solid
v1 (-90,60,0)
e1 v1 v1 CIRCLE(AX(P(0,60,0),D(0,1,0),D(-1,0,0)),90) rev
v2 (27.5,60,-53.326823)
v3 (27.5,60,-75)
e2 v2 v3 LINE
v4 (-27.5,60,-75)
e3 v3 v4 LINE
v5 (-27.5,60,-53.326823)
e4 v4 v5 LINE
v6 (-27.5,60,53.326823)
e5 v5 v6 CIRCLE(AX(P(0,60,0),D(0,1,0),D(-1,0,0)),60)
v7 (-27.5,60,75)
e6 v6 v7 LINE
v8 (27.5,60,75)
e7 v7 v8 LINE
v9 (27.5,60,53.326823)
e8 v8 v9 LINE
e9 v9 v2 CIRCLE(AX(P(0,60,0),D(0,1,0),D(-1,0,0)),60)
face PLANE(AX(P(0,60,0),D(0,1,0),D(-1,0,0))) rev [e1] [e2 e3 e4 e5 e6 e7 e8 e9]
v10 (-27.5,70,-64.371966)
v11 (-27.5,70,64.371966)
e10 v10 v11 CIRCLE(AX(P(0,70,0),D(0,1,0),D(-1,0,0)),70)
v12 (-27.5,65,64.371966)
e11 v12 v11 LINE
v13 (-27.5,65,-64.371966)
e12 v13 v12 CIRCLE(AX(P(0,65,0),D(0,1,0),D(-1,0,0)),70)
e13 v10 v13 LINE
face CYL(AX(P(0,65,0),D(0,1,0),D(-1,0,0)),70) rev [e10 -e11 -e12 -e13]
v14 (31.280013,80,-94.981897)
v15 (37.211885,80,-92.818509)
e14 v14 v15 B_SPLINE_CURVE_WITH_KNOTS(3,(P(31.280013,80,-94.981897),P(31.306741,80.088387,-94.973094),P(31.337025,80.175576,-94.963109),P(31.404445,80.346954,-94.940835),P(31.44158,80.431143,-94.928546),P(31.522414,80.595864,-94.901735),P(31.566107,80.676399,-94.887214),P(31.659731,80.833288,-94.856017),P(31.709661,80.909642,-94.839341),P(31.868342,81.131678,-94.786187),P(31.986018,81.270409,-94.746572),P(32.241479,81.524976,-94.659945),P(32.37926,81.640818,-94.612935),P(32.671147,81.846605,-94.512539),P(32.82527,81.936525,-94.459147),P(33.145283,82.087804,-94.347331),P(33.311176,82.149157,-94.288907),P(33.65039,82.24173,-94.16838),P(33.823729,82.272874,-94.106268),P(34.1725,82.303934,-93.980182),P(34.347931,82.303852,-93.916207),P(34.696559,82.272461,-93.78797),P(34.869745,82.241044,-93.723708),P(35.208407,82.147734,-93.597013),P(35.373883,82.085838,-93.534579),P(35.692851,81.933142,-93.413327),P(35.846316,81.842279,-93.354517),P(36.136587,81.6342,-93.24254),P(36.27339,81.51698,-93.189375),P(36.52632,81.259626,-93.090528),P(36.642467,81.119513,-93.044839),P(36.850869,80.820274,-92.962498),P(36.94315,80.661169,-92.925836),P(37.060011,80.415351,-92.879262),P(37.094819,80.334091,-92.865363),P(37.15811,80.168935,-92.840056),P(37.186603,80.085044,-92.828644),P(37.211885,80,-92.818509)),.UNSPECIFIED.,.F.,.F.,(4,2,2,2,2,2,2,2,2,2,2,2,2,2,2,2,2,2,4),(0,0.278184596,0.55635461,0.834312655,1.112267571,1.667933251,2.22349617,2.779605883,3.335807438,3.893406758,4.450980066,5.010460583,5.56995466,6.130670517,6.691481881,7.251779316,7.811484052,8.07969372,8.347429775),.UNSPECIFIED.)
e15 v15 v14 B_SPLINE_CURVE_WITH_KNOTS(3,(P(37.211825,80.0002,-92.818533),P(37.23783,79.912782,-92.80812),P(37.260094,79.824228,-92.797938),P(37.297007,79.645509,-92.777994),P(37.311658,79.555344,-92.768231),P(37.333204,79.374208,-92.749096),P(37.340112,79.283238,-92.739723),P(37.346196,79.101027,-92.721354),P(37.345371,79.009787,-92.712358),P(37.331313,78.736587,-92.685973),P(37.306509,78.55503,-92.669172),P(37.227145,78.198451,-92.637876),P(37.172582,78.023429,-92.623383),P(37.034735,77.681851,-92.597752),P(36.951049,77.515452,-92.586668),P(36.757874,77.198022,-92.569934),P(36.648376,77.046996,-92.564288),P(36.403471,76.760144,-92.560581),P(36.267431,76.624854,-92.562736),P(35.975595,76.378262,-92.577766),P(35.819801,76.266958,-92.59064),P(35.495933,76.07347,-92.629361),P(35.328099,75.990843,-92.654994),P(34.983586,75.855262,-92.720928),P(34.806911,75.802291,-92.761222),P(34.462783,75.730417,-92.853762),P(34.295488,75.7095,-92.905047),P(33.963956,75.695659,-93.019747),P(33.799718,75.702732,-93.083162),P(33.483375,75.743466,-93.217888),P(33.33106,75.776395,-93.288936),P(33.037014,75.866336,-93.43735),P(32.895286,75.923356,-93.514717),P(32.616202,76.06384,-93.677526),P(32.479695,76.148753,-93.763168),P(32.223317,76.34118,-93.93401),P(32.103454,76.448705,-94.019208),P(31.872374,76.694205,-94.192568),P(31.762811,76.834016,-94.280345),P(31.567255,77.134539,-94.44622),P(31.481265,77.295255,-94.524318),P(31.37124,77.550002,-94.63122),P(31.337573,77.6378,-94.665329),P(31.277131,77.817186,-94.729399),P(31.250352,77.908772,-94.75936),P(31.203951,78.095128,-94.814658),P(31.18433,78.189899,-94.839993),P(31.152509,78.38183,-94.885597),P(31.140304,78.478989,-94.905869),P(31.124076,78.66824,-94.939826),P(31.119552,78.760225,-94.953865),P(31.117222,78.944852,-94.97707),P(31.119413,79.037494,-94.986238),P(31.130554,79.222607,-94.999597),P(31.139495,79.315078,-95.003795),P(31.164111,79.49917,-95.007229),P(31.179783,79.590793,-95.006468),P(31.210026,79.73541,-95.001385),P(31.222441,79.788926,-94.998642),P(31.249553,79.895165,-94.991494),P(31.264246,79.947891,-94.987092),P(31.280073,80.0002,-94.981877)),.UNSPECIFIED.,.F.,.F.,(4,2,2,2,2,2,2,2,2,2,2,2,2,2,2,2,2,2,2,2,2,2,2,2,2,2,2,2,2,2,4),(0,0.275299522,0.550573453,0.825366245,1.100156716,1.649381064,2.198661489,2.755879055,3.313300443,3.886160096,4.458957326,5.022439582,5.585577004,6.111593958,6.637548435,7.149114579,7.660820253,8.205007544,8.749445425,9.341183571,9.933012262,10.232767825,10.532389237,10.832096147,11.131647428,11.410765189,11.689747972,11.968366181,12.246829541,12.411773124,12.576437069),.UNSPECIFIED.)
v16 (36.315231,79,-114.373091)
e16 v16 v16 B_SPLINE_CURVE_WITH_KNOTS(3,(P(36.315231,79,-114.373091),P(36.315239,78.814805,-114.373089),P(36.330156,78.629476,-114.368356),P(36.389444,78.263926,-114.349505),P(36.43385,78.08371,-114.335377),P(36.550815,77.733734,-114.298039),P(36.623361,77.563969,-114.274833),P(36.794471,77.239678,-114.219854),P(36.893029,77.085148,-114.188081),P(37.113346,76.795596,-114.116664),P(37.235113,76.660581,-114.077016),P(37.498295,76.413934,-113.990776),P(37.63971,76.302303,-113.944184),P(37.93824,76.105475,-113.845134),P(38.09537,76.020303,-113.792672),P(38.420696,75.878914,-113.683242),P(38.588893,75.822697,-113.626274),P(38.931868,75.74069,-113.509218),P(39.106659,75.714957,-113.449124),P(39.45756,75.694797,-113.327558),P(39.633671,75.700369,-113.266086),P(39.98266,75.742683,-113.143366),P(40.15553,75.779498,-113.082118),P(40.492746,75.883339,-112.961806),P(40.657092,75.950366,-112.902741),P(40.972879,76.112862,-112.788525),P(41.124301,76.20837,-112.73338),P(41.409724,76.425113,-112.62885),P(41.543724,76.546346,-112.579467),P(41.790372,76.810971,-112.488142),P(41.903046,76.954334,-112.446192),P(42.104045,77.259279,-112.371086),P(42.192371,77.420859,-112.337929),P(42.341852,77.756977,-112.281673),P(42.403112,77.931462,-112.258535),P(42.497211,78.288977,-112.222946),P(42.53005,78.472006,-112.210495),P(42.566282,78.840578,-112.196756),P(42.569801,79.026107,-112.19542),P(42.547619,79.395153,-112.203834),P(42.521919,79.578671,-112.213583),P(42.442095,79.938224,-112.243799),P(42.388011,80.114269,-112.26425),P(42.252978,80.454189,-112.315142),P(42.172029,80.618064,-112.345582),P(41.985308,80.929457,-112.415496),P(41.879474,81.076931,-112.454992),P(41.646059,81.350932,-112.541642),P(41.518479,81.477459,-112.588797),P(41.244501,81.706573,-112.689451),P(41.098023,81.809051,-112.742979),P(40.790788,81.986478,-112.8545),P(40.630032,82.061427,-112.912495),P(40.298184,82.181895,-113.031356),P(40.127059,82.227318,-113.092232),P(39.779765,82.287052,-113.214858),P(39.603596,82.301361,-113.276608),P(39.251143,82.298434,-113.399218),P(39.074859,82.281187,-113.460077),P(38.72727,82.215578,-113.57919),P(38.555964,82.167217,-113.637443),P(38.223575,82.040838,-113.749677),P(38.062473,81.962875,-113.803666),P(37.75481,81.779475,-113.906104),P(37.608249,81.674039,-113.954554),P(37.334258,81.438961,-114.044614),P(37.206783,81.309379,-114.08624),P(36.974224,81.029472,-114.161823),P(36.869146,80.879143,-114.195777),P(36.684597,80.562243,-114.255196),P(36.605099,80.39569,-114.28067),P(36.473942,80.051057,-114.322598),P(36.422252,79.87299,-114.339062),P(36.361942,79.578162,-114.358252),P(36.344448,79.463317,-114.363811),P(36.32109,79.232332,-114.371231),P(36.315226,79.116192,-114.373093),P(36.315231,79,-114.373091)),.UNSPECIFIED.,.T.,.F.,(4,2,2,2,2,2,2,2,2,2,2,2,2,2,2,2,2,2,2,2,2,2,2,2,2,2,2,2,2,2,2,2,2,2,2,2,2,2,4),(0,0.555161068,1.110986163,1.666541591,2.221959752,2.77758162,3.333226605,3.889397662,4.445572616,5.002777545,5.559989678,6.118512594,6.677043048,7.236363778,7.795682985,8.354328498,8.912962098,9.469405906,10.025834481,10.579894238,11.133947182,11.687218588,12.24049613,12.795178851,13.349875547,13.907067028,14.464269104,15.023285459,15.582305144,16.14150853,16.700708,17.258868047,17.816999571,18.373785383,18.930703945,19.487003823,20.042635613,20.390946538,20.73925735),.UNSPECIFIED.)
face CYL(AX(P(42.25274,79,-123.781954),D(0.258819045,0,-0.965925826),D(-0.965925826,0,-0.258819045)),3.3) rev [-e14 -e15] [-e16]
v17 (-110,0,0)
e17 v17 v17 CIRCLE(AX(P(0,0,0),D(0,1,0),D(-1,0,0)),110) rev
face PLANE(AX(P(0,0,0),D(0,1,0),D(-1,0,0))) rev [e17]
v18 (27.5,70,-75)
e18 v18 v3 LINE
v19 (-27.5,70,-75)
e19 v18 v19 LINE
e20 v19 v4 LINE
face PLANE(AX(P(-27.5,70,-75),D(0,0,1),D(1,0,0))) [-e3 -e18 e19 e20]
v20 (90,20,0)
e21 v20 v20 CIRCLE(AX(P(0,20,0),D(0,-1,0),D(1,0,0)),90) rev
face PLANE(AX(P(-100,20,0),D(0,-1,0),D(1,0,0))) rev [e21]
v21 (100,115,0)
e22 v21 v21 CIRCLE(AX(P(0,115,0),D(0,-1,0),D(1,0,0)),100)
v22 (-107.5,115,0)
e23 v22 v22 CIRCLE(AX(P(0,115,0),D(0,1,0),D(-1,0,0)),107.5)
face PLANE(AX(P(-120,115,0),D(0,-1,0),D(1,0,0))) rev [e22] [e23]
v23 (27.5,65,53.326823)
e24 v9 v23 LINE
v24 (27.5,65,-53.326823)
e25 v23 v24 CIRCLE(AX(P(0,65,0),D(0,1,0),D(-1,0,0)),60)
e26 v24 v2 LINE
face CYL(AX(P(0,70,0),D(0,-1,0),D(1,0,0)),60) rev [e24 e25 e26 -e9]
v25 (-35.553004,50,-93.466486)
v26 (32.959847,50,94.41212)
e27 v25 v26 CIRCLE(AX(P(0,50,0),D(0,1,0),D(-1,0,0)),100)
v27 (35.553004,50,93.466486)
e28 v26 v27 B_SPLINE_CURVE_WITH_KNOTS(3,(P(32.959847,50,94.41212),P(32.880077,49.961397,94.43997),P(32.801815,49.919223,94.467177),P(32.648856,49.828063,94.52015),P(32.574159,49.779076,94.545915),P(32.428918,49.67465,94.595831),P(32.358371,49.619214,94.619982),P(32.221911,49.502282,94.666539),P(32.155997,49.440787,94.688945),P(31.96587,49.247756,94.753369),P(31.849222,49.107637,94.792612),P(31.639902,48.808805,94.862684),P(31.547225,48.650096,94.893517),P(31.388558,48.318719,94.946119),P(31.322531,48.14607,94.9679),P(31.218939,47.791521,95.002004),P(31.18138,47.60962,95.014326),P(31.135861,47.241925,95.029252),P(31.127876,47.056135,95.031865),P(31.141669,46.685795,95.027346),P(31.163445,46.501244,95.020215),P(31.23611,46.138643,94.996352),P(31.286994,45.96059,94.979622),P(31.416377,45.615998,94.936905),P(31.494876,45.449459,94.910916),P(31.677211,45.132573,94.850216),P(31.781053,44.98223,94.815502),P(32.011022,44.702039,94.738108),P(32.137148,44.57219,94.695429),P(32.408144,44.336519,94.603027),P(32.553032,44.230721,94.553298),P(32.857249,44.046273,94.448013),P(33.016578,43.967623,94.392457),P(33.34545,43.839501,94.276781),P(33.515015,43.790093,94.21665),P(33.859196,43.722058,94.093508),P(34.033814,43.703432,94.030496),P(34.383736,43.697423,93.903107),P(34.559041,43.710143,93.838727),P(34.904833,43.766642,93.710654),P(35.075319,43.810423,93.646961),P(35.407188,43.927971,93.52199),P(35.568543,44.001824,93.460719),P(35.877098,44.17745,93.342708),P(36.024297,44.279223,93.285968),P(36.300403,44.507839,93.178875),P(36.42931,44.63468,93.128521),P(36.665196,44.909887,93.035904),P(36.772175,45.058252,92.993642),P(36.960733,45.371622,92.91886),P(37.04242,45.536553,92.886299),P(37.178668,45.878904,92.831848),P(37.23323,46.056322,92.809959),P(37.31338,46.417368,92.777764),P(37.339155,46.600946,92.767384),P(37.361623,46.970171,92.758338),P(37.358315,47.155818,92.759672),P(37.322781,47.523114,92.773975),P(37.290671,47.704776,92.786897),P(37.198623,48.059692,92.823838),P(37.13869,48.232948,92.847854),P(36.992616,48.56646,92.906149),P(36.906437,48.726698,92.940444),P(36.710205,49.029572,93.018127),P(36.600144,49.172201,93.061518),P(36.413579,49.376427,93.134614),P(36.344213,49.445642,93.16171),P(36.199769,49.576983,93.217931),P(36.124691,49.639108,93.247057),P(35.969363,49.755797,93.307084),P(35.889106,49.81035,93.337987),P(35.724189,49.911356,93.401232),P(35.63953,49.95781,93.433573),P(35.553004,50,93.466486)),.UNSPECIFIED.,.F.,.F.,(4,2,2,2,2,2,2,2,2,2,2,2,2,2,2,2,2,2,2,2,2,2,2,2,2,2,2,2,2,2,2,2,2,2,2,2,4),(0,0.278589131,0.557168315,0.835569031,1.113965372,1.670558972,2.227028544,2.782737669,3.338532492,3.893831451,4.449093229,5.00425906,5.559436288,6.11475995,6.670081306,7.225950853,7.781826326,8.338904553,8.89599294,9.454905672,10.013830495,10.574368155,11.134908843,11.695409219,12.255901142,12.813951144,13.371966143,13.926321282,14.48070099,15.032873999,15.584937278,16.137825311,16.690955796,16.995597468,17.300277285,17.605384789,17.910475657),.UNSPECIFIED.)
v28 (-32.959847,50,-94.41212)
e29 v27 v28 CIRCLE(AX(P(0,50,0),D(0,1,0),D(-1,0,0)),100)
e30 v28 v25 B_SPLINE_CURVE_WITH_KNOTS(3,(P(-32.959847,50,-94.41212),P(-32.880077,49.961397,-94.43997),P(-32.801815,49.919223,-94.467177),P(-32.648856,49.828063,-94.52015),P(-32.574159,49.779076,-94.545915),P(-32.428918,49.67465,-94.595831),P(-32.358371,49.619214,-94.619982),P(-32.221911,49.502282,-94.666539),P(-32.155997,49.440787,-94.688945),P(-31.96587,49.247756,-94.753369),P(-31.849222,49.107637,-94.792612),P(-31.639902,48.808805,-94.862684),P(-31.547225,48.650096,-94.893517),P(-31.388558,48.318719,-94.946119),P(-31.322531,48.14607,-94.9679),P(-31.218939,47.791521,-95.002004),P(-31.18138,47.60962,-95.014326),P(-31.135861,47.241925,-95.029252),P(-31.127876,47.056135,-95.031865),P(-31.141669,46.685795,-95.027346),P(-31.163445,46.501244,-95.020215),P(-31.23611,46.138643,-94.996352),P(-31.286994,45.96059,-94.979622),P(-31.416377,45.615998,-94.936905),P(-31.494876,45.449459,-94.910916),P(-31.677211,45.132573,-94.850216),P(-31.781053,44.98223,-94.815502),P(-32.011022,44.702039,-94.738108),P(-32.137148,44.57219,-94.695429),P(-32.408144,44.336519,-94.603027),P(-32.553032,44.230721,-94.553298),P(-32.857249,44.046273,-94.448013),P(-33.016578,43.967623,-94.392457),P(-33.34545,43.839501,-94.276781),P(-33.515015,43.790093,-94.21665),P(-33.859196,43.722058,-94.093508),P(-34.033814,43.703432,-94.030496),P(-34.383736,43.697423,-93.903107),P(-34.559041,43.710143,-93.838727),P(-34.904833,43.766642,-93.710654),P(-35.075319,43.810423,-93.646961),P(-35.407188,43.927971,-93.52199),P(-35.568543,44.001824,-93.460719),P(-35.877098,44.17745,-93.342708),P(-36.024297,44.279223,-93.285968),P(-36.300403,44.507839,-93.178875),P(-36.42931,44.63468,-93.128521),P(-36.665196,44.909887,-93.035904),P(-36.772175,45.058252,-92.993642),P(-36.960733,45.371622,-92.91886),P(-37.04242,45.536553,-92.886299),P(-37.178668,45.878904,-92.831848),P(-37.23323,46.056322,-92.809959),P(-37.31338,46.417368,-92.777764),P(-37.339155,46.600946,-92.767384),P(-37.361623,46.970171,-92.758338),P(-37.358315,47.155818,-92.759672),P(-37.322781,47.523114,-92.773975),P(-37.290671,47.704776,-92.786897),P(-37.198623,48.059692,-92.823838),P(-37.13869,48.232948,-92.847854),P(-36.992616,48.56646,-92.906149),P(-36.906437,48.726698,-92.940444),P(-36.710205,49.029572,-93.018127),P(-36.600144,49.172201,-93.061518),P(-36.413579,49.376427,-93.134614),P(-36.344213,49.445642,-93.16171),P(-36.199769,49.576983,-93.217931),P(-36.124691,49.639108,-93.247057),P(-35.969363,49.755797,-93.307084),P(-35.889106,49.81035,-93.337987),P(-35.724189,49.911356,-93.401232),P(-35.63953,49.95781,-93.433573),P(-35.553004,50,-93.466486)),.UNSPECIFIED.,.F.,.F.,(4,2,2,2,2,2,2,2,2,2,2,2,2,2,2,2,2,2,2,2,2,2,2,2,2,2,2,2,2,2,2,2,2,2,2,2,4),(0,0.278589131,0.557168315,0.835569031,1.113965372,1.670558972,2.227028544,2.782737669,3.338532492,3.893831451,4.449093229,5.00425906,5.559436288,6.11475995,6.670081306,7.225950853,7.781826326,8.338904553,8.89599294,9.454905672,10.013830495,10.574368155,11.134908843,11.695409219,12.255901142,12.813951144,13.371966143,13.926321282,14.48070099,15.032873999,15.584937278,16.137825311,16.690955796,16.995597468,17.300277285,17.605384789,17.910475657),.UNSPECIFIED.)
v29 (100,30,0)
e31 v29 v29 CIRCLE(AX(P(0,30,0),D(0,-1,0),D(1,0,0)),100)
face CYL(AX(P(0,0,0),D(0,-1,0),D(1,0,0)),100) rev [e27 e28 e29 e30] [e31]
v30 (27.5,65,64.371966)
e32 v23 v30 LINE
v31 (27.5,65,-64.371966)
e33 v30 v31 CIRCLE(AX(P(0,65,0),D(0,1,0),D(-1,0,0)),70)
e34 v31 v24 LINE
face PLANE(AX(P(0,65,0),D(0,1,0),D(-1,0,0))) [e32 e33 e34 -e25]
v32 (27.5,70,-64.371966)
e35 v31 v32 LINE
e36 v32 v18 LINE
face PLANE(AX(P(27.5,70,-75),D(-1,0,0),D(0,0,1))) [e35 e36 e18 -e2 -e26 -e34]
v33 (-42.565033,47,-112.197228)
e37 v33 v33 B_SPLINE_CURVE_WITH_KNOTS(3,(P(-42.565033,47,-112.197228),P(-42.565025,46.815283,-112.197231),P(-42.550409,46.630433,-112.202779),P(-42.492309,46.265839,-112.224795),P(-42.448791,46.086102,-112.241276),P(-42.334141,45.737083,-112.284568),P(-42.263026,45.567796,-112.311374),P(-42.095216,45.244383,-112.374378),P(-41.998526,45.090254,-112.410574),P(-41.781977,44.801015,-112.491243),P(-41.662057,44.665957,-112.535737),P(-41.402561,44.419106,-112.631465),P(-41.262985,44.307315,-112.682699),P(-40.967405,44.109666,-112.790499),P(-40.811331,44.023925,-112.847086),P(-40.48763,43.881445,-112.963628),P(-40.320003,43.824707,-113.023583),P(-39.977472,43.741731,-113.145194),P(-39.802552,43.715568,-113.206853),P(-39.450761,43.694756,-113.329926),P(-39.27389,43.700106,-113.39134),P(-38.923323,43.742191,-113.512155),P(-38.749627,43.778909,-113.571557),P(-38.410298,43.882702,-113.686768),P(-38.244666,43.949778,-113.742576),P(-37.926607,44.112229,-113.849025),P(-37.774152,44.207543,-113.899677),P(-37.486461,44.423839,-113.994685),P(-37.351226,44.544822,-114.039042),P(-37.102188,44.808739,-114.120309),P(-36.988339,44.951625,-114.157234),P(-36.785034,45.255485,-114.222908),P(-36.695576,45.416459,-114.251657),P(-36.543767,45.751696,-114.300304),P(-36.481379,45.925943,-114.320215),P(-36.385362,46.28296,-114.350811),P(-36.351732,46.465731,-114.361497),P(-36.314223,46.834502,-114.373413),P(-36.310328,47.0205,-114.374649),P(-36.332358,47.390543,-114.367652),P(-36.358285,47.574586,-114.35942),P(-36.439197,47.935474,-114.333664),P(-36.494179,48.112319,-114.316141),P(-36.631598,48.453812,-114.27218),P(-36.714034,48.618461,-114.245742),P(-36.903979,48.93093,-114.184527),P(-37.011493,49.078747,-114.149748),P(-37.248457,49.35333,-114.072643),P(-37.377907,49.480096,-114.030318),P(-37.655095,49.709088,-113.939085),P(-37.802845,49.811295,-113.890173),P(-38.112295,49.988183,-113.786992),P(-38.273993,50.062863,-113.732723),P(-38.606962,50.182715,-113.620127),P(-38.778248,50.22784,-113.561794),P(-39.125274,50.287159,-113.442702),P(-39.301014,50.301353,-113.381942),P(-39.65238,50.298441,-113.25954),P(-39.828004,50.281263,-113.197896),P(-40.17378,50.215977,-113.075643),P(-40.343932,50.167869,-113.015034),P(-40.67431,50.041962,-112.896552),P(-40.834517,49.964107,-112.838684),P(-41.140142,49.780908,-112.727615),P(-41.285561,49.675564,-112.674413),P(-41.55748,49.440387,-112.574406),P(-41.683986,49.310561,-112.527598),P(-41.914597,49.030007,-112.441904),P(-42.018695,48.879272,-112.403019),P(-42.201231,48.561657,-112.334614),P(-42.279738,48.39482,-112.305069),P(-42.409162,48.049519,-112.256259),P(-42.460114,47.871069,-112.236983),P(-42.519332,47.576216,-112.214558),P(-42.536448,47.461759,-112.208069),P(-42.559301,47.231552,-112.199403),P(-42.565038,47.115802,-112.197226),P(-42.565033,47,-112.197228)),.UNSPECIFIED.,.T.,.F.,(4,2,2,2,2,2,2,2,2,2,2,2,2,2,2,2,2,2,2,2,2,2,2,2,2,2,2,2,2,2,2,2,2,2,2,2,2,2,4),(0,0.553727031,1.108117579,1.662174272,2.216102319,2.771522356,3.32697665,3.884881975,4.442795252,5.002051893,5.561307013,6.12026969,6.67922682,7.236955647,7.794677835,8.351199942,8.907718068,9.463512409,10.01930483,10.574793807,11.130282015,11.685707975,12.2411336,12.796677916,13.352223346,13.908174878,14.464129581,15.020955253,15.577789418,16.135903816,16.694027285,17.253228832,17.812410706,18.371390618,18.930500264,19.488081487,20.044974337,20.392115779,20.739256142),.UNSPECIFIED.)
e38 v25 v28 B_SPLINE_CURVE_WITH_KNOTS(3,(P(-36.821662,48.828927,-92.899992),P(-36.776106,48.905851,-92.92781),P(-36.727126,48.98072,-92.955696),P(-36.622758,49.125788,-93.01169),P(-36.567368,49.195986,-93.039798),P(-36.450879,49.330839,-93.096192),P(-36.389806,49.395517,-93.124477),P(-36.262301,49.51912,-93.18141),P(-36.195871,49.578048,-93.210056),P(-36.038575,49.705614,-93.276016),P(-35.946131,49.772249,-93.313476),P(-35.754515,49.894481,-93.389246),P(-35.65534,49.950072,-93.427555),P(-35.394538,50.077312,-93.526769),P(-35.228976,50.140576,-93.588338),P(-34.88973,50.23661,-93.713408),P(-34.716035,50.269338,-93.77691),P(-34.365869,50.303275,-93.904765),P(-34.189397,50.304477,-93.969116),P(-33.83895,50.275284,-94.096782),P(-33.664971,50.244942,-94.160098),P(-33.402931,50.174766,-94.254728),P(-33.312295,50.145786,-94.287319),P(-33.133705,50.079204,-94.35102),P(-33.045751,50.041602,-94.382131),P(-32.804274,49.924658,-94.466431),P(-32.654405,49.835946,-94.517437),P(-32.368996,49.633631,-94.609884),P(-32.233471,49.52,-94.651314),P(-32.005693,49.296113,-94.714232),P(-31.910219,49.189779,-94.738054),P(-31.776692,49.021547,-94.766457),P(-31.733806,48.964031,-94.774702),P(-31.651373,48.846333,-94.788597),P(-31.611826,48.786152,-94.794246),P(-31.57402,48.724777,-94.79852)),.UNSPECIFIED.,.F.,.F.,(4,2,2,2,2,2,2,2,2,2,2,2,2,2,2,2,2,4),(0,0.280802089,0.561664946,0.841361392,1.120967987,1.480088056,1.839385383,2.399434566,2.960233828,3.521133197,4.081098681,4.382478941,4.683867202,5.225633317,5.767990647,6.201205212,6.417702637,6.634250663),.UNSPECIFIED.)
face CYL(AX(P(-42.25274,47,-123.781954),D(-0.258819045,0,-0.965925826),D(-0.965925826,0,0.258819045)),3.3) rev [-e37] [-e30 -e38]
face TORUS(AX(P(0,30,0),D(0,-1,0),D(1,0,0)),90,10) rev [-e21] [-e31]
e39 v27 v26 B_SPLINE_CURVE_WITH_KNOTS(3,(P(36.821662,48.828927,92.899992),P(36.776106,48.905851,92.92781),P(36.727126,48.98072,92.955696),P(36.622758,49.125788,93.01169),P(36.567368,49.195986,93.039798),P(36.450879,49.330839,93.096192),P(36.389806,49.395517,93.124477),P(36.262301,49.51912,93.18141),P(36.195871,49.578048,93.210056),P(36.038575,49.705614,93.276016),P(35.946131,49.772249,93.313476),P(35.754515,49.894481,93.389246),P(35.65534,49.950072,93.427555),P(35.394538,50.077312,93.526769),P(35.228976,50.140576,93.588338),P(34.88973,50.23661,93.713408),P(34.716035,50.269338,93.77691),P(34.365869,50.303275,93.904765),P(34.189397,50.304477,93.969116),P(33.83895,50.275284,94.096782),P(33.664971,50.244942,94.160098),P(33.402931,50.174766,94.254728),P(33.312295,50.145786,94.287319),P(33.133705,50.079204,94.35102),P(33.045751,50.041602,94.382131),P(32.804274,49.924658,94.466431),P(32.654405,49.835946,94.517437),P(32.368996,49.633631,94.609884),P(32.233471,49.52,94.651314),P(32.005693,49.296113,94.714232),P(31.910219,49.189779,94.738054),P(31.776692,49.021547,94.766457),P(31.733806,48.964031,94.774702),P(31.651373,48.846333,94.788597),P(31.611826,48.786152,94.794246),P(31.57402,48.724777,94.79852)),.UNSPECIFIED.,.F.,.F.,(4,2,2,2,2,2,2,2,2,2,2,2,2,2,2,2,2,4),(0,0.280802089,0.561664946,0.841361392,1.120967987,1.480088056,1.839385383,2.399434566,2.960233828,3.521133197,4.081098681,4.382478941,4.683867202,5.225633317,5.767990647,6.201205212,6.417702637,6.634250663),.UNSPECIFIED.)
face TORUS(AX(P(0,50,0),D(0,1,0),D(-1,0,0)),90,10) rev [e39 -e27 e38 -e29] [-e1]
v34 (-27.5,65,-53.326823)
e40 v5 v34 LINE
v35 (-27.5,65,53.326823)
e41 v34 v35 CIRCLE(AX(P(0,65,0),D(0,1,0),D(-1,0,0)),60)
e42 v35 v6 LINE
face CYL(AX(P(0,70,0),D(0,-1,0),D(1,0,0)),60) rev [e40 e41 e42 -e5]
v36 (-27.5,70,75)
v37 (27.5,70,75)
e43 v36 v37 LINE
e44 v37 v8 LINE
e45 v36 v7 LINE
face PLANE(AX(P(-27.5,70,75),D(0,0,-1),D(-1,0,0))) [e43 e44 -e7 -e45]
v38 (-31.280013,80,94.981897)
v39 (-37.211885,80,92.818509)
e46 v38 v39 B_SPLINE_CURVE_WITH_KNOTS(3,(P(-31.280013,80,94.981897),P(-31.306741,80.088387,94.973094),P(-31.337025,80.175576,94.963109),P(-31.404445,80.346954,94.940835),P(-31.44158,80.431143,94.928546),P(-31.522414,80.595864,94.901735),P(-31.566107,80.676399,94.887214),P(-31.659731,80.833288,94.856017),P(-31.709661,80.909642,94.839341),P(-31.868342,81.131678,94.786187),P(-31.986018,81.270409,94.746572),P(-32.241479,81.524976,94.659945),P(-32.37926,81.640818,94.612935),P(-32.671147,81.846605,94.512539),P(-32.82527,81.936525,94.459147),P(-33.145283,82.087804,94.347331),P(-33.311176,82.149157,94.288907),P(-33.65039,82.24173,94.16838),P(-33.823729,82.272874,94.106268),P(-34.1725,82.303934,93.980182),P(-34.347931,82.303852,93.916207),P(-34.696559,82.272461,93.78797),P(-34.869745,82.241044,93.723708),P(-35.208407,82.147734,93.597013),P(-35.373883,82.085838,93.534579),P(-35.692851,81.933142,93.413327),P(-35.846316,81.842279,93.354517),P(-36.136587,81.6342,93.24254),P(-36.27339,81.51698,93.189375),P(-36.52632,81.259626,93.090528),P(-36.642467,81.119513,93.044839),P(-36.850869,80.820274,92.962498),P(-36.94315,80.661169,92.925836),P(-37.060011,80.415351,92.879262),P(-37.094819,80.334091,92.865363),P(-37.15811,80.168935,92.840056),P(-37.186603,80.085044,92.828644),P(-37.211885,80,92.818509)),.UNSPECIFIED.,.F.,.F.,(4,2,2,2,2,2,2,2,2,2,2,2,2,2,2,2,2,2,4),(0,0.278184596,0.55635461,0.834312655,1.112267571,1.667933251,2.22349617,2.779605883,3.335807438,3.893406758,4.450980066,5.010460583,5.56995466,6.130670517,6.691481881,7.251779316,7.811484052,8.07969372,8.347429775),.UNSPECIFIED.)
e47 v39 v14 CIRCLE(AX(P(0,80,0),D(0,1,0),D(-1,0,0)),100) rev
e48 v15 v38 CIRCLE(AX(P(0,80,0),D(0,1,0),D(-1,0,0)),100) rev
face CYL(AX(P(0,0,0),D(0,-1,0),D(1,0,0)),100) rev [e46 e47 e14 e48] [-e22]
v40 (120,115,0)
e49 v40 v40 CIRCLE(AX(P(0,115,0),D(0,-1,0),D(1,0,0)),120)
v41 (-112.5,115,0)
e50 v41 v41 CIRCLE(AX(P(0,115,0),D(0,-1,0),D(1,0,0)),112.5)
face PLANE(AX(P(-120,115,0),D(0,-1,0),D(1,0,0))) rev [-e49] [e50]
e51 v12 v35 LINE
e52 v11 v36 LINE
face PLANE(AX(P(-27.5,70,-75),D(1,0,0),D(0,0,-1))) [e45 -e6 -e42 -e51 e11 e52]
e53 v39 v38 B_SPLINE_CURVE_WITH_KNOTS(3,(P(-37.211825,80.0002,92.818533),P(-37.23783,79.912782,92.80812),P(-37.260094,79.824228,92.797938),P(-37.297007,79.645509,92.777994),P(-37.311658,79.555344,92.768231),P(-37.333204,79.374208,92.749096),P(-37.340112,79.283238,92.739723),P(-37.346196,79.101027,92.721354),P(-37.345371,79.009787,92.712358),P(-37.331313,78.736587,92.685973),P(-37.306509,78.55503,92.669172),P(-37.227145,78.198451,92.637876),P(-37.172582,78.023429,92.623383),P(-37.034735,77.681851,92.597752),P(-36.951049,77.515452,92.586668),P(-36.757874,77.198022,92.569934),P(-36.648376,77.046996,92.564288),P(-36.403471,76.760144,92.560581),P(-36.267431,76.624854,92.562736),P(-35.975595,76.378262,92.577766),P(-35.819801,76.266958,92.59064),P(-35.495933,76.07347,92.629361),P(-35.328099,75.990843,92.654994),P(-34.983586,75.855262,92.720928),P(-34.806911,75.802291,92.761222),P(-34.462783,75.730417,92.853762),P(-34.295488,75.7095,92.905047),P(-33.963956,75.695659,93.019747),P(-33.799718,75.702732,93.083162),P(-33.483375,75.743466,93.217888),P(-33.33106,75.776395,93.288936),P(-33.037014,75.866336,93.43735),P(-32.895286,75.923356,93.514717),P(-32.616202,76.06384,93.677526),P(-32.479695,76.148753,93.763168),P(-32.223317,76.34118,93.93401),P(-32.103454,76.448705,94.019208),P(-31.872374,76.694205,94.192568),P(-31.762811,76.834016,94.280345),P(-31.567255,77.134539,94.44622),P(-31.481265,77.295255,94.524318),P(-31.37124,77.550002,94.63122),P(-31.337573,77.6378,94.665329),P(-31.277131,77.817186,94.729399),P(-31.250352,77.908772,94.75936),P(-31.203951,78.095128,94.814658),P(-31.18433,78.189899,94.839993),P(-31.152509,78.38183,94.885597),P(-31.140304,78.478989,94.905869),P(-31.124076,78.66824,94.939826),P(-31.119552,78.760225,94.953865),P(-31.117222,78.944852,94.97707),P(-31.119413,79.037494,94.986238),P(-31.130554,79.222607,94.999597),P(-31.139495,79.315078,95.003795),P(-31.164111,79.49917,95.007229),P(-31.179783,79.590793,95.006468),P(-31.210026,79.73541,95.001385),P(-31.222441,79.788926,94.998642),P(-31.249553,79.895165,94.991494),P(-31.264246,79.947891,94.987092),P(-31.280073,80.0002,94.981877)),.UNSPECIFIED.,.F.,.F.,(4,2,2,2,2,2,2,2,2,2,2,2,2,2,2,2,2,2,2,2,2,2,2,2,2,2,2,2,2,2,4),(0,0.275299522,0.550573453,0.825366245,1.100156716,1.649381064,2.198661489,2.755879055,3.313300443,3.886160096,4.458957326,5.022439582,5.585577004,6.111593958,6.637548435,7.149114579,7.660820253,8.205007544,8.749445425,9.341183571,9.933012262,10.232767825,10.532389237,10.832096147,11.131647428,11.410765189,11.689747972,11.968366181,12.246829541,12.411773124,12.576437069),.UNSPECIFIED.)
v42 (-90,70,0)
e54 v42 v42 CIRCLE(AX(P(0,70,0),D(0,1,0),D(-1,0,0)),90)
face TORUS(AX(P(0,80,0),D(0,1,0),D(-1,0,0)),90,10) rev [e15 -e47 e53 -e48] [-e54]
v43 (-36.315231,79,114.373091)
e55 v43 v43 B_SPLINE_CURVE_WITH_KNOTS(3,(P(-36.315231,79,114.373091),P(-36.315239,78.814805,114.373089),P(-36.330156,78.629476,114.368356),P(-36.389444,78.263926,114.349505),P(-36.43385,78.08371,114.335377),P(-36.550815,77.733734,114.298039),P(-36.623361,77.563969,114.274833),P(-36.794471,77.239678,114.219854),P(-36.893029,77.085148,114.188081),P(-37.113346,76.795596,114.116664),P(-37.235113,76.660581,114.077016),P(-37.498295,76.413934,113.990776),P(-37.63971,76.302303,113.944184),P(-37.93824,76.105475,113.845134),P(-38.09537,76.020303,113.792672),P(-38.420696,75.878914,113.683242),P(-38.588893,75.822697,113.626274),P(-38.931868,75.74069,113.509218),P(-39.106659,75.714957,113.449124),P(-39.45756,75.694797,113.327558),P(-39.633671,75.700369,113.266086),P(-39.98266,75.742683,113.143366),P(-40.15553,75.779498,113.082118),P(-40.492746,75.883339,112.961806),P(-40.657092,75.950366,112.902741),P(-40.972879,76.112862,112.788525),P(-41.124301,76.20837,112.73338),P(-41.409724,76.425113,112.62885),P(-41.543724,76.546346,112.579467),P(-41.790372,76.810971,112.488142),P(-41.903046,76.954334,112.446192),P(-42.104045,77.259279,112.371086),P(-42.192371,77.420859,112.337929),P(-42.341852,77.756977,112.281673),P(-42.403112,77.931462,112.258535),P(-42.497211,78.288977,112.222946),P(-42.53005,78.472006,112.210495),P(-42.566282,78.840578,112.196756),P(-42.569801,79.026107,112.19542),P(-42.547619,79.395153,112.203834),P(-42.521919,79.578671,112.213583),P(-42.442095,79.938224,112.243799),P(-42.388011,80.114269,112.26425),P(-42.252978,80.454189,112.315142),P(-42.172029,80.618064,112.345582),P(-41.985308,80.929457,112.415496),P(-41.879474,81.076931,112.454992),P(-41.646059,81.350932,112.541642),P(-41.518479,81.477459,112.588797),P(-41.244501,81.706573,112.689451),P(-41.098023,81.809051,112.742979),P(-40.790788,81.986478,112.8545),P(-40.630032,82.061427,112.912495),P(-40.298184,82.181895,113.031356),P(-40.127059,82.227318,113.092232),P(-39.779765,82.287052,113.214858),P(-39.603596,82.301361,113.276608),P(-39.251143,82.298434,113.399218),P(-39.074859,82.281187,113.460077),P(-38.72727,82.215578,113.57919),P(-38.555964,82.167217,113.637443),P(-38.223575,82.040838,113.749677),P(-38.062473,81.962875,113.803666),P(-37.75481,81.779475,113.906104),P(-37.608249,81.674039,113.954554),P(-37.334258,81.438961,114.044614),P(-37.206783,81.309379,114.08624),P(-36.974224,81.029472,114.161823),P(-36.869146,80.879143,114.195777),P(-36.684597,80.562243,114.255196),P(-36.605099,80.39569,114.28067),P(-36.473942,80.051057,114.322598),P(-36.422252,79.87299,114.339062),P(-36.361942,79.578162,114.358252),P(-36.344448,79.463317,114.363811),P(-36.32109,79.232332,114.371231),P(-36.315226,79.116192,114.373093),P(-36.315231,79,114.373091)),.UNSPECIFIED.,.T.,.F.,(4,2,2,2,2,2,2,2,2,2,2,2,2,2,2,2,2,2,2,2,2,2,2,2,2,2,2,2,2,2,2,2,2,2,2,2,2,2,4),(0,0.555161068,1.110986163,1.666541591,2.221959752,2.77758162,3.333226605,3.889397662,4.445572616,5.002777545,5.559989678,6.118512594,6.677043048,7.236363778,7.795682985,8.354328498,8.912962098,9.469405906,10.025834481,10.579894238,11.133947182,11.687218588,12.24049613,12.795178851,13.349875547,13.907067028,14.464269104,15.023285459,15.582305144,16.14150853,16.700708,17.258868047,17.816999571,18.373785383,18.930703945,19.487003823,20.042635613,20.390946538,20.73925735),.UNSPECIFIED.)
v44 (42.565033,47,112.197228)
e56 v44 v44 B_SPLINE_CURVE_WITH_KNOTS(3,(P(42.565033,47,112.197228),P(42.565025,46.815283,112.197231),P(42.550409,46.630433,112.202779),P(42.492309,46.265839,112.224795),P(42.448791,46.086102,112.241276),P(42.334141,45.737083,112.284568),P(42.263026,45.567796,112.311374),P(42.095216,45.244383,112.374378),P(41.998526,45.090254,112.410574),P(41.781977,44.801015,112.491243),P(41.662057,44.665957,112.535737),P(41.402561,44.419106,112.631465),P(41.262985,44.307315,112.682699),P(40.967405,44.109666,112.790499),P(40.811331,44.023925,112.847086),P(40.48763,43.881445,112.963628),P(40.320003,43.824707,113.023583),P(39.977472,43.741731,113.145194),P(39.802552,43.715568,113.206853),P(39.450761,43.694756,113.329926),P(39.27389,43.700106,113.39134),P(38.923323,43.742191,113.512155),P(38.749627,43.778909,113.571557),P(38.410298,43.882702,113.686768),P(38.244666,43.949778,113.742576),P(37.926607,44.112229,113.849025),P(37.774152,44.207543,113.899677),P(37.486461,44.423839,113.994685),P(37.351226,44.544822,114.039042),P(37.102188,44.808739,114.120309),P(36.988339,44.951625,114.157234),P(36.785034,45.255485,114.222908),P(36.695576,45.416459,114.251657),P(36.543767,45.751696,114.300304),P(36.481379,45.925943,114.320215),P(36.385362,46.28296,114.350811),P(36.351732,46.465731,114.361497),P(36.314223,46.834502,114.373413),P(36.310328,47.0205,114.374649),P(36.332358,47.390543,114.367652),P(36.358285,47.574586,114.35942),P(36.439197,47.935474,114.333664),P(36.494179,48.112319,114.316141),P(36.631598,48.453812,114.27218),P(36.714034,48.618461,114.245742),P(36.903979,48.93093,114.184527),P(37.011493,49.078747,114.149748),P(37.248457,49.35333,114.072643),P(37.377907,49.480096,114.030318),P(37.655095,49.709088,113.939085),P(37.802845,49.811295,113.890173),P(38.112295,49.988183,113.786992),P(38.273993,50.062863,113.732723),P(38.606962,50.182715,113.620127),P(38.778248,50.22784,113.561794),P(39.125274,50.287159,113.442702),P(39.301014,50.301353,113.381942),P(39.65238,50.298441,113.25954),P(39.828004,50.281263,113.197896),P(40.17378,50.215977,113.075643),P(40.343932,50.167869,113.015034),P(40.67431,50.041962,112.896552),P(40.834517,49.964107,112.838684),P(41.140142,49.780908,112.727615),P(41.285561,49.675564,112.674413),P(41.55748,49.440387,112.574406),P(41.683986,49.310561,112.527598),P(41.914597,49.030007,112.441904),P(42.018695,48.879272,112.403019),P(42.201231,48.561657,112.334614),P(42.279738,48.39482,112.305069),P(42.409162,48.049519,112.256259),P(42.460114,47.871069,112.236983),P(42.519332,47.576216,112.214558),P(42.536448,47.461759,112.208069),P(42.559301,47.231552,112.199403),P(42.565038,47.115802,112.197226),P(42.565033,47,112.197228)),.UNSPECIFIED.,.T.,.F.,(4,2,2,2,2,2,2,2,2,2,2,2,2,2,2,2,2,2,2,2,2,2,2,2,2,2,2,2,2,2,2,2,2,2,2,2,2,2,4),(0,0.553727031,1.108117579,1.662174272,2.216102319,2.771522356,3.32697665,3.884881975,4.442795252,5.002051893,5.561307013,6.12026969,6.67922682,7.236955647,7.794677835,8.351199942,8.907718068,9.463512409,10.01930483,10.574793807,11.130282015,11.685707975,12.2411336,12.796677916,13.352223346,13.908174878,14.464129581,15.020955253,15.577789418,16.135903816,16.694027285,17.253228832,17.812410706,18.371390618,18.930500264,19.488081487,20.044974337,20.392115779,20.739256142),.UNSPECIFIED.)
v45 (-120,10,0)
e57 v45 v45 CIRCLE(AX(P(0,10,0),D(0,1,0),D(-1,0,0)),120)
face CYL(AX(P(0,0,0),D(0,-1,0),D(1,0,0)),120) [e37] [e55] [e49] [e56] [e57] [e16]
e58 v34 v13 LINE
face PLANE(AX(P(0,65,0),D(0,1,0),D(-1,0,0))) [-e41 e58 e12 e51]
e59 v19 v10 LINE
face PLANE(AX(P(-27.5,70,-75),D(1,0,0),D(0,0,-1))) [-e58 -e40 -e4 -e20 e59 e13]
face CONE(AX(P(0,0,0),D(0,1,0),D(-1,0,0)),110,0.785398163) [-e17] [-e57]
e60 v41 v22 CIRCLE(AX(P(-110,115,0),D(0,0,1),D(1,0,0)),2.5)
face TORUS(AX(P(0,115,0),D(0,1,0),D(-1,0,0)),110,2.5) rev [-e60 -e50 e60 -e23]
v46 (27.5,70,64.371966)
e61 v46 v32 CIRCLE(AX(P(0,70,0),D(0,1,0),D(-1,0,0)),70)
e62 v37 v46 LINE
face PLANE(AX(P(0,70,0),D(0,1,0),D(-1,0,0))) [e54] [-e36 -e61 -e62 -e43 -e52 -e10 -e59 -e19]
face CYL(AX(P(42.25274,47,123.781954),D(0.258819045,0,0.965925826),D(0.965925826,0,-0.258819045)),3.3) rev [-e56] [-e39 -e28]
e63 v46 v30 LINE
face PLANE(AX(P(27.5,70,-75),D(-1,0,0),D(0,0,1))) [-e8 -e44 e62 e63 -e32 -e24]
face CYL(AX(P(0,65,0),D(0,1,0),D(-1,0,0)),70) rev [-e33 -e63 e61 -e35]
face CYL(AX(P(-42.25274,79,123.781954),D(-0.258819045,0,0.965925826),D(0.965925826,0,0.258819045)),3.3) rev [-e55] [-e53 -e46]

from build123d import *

# Parameters (mm, degrees)
CROQUIS2_R                           = 100
CROQUIS2_R_2                         = 60
SALIENTE_EXTRUIR1_DEPTH              = 10
CORTAR_EXTRUIR1_START                = -5
CROQUIS3_R                           = 70
CROQUIS3_R_2                         = 60
CORTAR_EXTRUIR1_DEPTH                = 5
CROQUIS4_W                           = 55
CROQUIS4_H                           = 150
CORTAR_EXTRUIR3_DEPTH                = 10
REDONDEO1_R                          = 10
CHAFL_N1_SIZE                        = 10
CROQUIS6_R                           = 2.5
TALADRO_DE_MARGEN_PARA_M65_D         = 6.6
TALADRO_DE_MARGEN_PARA_M65_DEPTH     = 40
TALADRO_DE_MARGEN_PARA_M65_TIP       = 1.982840043
TALADRO_DE_MARGEN_PARA_M66_D         = 6.6
TALADRO_DE_MARGEN_PARA_M66_DEPTH     = 40
TALADRO_DE_MARGEN_PARA_M66_TIP       = 1.982840043
TALADRO_START                        = 98
TALADRO_DE_MARGEN_PARA_M67_OUTLINE_R = 3.3
TALADRO_DE_MARGEN_PARA_M67_DEPTH     = 23
TALADRO_START_2                      = -121
TALADRO_DE_MARGEN_PARA_M68_OUTLINE_R = 3.3
TALADRO_DE_MARGEN_PARA_M68_DEPTH     = 23


with BuildPart() as part:
    # Croquis1 → Revolución1 (revolve)
    with BuildSketch(Plane.XY, mode=Mode.PRIVATE) as revoluci_n1_sk:
        Polygon((0, 0), (-120, 0), (-120, 115), (-100, 115), (-100, 20), (0, 20), align=None)
    revolve(revoluci_n1_sk.sketch.rotate(Axis((0, 0, 0), (0, 1, 0)), 180), axis=Axis((0, 0, 0), (0, 1, 0)))

    # Croquis2 → Saliente-Extruir1 (add)
    with BuildSketch(Plane(origin=(0, 60, 0), x_dir=(1, 0, 0), z_dir=(0, 1, 0))):
        Circle(CROQUIS2_R)
        with Locations(Location((0, 0, 0), (0, 0, 180))):
            Circle(CROQUIS2_R_2, mode=Mode.SUBTRACT)
    extrude(amount=SALIENTE_EXTRUIR1_DEPTH)

    # Croquis3 → Cortar-Extruir1 (cut)
    with BuildSketch(Plane(origin=(0, 70, 0), x_dir=(1, 0, 0), z_dir=(0, 1, 0)).offset(CORTAR_EXTRUIR1_START)):
        with Locations(Location((0, 0, 0), (0, 0, 180))):
            Circle(CROQUIS3_R)
        with Locations(Location((0, 0, 0), (0, 0, 180))):
            Circle(CROQUIS3_R_2, mode=Mode.SUBTRACT)
    extrude(amount=CORTAR_EXTRUIR1_DEPTH, mode=Mode.SUBTRACT)

    # Croquis4 → Cortar-Extruir3 (cut)
    with BuildSketch(Plane(origin=(0, 60, 0), x_dir=(1, 0, 0), z_dir=(0, 1, 0))):
        Rectangle(CROQUIS4_W, CROQUIS4_H)
    extrude(amount=CORTAR_EXTRUIR3_DEPTH, mode=Mode.SUBTRACT)

    # Redondeo1
    redondeo1_edges = [part.edges().sort_by_distance(p)[0] for p in [
        (-100, 60, 0),
        (-100, 70, 0),
        (-100, 20, 0),
    ]]
    fillet(redondeo1_edges, radius=REDONDEO1_R)

    # Chaflán1
    chafl_n1_edges = [part.edges().sort_by_distance(p)[0] for p in [
        (-120, 0, 0),
    ]]
    chamfer(chafl_n1_edges, length=CHAFL_N1_SIZE)

    # Cortar-Barrer1: sweep along a path in Croquis5
    with BuildLine(Plane(origin=(0, 115, 0), x_dir=(1, 0, 0), z_dir=(0, 1, 0))) as cortar_barrer1_path:
        CenterArc((0, 0), 110, 0, 360)
    # Croquis6 → Cortar-Barrer1 (sweep, cut)
    with BuildSketch(Plane.XY):
        with Locations((-110, 115)):
            Circle(CROQUIS6_R)
    sweep(path=cortar_barrer1_path.line, mode=Mode.SUBTRACT)

    # Taladro de margen para M65
    with Locations(Plane(origin=(33.775885386, 0, -126.053320331), x_dir=(0, -1, 0), z_dir=(0.2588190451025245, 0, -0.9659258262890673))):
        with Locations((-79, -8.775885386)):
            Hole(TALADRO_DE_MARGEN_PARA_M65_D / 2, depth=TALADRO_DE_MARGEN_PARA_M65_DEPTH)
            with Locations((0, 0, -(TALADRO_DE_MARGEN_PARA_M65_DEPTH + TALADRO_DE_MARGEN_PARA_M65_TIP / 2))):  # 118° drill point
                Cone(0, TALADRO_DE_MARGEN_PARA_M65_D / 2, TALADRO_DE_MARGEN_PARA_M65_TIP, mode=Mode.SUBTRACT)

    # Taladro de margen para M66
    with Locations(Plane(origin=(-33.775885386, 0, -126.053320331), x_dir=(0, -1, 0), z_dir=(-0.25881904510252496, 0, -0.9659258262890672))):
        with Locations((-47, 8.775885386)):
            Hole(TALADRO_DE_MARGEN_PARA_M66_D / 2, depth=TALADRO_DE_MARGEN_PARA_M66_DEPTH)
            with Locations((0, 0, -(TALADRO_DE_MARGEN_PARA_M66_DEPTH + TALADRO_DE_MARGEN_PARA_M66_TIP / 2))):  # 118° drill point
                Cone(0, TALADRO_DE_MARGEN_PARA_M66_D / 2, TALADRO_DE_MARGEN_PARA_M66_TIP, mode=Mode.SUBTRACT)

    # Taladro de margen para M67: read off the stored shape, not the designer's step
    # Taladro de margen para M67 outline → Taladro de margen para M67 (cut)
    with BuildSketch(Plane(origin=(0, 0, 0), x_dir=(0.9659258262890652, 0, -0.2588190451025322), z_dir=(0.2588190451025321, 0, 0.9659258262890653)).offset(TALADRO_START)):
        with Locations((8.775885386, 47)):
            Circle(TALADRO_DE_MARGEN_PARA_M67_OUTLINE_R)
    extrude(amount=TALADRO_DE_MARGEN_PARA_M67_DEPTH, mode=Mode.SUBTRACT)

    # Taladro de margen para M68: read off the stored shape, not the designer's step
    # Taladro de margen para M68 outline → Taladro de margen para M68 (cut)
    with BuildSketch(Plane(origin=(0, 0, 0), x_dir=(0.9659258262890691, 0, 0.25881904510251813), z_dir=(0.2588190451025181, 0, -0.9659258262890691)).offset(TALADRO_START_2)):
        with Locations((-8.775885386, -79)):
            Circle(TALADRO_DE_MARGEN_PARA_M68_OUTLINE_R)
    extrude(amount=TALADRO_DE_MARGEN_PARA_M68_DEPTH, mode=Mode.SUBTRACT)


solid = part.part
